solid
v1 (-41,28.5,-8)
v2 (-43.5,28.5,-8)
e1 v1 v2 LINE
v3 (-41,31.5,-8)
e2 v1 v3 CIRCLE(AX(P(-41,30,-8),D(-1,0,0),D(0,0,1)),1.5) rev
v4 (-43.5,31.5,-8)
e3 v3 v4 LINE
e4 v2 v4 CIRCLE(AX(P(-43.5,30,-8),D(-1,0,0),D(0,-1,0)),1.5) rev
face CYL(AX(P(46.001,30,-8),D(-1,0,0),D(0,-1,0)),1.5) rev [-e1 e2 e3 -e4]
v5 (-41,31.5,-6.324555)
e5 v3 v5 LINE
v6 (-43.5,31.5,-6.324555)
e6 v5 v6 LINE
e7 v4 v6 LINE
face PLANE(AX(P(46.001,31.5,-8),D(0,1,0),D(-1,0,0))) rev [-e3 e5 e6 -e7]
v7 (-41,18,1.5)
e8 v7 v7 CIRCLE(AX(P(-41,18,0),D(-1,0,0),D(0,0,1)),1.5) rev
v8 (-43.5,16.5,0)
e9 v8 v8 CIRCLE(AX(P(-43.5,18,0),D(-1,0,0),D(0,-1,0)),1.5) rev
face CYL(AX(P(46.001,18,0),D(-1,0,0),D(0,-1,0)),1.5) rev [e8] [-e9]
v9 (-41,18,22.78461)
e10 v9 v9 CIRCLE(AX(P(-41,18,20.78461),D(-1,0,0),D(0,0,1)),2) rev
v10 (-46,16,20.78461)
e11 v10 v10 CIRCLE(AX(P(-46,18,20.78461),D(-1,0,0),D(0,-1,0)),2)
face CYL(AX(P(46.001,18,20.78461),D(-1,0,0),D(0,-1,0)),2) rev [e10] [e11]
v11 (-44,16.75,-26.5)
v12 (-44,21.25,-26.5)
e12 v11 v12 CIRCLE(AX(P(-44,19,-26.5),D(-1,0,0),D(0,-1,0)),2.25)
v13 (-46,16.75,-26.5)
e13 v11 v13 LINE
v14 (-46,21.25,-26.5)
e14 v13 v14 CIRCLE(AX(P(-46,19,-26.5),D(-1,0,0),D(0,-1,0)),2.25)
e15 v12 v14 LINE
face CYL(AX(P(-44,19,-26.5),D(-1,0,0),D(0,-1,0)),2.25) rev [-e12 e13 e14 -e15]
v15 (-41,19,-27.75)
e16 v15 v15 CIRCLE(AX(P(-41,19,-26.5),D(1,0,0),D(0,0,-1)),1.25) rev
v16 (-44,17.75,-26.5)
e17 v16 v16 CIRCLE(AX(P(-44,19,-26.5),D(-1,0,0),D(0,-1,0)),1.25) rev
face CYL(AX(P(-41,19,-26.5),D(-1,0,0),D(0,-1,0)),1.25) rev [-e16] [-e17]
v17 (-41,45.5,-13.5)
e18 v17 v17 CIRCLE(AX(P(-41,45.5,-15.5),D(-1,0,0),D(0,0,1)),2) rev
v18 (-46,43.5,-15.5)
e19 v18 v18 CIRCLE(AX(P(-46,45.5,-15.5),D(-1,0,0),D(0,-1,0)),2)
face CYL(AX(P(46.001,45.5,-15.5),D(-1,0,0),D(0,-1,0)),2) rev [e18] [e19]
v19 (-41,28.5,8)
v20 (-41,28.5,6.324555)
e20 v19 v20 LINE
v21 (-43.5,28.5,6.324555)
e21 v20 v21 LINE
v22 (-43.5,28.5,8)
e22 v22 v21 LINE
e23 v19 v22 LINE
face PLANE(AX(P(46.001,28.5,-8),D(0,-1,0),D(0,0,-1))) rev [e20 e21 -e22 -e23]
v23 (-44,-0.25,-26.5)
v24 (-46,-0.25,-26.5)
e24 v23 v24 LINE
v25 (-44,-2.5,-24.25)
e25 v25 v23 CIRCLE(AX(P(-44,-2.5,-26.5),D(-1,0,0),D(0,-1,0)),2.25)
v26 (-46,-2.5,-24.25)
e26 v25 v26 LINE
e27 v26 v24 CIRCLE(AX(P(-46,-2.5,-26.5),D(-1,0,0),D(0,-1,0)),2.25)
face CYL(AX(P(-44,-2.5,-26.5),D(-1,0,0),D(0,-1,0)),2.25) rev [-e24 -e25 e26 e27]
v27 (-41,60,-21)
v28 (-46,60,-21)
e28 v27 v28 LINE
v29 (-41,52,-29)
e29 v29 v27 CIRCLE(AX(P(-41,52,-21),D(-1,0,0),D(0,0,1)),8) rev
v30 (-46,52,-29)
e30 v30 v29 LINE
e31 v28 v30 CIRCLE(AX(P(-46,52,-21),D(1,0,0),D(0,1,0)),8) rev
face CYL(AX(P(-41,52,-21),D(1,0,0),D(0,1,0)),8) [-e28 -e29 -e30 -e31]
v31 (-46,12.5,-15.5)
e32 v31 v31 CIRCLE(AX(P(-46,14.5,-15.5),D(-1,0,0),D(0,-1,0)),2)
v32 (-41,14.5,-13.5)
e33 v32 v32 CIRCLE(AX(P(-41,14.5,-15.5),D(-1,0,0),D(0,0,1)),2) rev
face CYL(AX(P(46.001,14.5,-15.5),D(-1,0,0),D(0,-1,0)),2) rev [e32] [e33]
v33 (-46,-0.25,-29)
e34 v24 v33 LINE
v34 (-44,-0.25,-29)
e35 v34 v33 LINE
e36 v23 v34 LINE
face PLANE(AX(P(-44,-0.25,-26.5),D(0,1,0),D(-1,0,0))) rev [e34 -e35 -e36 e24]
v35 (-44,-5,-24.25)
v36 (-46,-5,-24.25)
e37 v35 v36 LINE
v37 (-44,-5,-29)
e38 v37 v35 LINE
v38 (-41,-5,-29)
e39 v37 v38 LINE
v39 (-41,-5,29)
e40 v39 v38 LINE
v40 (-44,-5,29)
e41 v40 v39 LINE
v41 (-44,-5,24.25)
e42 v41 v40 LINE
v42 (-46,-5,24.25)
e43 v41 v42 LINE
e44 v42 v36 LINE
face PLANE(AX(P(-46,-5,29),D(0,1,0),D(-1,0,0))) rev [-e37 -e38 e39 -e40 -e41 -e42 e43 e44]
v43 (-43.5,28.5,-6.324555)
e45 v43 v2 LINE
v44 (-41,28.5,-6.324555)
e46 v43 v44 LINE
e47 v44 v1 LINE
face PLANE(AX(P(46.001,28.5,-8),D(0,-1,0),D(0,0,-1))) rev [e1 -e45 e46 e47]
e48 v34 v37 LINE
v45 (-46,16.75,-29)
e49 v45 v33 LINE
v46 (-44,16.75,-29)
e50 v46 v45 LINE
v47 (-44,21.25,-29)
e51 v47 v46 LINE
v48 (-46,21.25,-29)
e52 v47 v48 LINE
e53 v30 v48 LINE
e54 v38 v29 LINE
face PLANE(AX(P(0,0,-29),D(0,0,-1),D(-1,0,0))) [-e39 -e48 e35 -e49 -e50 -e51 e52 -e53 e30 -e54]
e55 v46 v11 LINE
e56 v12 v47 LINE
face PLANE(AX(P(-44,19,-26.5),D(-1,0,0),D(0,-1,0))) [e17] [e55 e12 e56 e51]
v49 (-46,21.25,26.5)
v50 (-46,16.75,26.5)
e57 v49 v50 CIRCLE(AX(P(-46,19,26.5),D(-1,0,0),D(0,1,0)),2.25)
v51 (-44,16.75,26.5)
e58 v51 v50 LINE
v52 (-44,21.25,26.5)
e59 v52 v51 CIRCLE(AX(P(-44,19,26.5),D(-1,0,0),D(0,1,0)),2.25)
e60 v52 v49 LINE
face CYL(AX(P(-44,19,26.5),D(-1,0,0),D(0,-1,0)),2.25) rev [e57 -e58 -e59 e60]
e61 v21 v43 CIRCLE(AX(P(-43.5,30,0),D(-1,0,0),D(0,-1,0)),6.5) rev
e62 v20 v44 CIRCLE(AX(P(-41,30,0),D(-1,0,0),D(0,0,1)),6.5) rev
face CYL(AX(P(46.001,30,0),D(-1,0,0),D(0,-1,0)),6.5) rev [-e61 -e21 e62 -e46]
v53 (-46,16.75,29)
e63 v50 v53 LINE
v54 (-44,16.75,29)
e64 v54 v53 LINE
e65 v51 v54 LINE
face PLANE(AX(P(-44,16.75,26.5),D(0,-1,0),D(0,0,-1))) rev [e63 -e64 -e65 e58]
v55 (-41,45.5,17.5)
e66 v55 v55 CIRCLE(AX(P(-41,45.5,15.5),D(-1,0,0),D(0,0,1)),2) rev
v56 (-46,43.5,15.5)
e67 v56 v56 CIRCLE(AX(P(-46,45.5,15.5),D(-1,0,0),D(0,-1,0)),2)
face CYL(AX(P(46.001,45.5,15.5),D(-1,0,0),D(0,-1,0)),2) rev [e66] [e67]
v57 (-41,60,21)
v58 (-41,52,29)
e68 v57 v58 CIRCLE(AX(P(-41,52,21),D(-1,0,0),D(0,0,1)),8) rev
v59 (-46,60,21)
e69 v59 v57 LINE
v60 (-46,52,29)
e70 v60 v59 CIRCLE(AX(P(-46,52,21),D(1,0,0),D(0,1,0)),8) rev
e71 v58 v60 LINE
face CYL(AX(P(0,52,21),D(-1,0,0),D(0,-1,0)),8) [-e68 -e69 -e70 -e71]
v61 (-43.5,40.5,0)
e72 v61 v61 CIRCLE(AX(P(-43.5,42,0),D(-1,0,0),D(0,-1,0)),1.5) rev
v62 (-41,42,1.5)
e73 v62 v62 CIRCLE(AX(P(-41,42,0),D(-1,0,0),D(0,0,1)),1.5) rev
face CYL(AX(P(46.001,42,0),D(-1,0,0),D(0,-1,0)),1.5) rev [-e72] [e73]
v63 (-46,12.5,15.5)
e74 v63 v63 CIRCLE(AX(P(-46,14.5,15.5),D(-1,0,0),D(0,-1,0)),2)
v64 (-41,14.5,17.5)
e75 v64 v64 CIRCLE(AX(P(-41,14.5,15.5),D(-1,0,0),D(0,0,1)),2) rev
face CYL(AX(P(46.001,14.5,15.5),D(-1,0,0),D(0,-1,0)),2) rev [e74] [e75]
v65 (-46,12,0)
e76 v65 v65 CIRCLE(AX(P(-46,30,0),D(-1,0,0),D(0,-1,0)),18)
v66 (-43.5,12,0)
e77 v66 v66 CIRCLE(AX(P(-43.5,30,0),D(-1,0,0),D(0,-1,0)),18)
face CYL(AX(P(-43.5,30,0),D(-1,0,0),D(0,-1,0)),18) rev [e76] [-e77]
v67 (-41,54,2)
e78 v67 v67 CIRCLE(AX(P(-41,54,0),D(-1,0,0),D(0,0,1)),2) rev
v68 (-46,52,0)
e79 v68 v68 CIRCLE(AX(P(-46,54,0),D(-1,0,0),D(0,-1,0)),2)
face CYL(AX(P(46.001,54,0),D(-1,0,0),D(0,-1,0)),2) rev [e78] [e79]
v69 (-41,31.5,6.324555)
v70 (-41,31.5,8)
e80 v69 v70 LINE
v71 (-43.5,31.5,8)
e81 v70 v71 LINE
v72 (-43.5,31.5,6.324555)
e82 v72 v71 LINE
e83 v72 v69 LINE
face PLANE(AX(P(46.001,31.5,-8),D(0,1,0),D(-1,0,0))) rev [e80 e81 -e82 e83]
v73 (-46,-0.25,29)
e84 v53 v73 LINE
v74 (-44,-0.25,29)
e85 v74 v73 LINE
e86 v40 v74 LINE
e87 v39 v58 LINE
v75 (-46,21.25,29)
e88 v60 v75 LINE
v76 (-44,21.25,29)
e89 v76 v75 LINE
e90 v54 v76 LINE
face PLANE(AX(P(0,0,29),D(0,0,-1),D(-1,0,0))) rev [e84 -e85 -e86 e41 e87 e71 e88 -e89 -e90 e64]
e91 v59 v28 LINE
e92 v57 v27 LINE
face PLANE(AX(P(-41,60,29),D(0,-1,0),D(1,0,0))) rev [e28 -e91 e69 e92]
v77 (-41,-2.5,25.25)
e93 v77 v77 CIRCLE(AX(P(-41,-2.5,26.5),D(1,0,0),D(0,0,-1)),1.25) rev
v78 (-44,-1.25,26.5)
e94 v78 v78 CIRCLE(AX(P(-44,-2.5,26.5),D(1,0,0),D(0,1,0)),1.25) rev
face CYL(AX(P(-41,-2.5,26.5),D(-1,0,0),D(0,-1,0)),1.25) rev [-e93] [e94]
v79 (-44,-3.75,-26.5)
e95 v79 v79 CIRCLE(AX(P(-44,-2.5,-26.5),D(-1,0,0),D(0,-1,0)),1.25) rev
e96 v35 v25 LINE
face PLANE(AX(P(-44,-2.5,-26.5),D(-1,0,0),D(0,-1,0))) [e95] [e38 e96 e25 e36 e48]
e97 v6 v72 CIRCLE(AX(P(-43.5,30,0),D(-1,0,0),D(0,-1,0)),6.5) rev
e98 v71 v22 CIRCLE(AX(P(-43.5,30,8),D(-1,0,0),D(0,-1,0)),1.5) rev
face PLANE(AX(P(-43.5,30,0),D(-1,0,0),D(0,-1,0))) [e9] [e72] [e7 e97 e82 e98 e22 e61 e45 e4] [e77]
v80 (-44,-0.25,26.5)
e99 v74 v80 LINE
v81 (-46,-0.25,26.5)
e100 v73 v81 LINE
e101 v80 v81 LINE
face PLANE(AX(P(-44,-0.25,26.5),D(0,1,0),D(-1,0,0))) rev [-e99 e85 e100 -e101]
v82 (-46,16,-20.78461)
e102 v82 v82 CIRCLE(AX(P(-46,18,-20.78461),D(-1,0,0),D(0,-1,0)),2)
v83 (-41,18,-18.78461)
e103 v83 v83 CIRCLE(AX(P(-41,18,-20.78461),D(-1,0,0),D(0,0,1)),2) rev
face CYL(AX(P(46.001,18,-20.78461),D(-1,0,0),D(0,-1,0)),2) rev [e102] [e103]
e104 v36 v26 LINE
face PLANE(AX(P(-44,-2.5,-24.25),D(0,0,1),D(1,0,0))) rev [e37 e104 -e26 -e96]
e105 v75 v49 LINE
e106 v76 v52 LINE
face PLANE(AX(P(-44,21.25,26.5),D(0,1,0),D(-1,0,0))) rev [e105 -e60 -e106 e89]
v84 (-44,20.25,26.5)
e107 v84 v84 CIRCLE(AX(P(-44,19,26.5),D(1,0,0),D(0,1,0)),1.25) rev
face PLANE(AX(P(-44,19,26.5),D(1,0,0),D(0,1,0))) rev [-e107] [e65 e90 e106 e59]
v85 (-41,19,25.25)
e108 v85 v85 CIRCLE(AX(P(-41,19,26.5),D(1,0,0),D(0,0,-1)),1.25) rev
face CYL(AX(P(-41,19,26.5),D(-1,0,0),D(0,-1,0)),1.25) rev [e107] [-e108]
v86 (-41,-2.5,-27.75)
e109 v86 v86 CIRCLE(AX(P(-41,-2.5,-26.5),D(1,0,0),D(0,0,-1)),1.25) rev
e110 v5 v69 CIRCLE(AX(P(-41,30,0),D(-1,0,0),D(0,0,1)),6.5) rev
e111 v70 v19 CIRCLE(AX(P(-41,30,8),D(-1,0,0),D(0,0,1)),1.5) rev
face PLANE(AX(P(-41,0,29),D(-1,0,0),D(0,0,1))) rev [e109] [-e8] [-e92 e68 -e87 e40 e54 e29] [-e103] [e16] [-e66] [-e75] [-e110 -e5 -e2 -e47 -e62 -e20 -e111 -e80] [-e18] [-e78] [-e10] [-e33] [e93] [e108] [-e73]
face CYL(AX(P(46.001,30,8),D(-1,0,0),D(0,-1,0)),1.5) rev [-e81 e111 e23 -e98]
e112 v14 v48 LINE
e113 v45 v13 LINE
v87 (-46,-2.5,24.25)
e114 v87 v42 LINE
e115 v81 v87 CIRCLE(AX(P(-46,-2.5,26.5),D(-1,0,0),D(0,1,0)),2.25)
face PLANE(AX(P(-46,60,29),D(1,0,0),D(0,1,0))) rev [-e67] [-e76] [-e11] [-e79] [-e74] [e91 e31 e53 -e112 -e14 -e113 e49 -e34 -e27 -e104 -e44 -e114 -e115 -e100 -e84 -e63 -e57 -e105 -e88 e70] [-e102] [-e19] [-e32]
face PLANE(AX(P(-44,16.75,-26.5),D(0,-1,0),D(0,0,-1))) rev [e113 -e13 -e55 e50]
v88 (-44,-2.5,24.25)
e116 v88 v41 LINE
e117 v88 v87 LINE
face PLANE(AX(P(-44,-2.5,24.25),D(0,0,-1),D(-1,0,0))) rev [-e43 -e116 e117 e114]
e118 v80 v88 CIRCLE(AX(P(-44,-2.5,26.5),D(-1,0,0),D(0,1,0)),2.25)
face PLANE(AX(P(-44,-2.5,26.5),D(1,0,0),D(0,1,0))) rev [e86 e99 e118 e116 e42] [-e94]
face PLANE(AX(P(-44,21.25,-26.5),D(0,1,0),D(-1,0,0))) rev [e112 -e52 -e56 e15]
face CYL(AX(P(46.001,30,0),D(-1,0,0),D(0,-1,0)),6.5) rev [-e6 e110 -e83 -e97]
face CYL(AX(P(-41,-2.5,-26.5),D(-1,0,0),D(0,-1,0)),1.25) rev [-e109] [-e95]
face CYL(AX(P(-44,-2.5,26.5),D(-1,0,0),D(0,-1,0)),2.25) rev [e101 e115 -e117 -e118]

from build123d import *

# Parameters (mm, degrees)
RESSALTO_EXTRUS_O1_DEPTH  = 29
CORTE_EXTRUS_O1_REACH     = 115.6
ESBO_O2_R                 = 6.5
ESBO_O3_R                 = 18
CORTE_EXTRUS_O2_DEPTH     = 2.5
CORTE_EXTRUS_O3_START     = -5
ESBO_O5_R                 = 2
ESBO_O5_R_2               = 1.5
CORTE_EXTRUS_O3_DEPTH     = 5
ESBO_O7_R                 = 12
ESBO_O7_R_2               = 2
CORTE_EXTRUS_O4_DEPTH     = 110.590145542
ESBO_O11_W                = 18
ESBO_O11_H                = 10
RESSALTO_EXTRUS_O3_DEPTH  = 8
ESBO_O12_W                = 14.4
ESBO_O12_H                = 6.8
CORTE_EXTRUS_O6_DEPTH     = 3
ESBO_O13_W                = 13.4
ESBO_O13_H                = 5.8
CORTE_EXTRUS_O7_DEPTH     = 5
CORTE_EXTRUS_O8_REACH     = 84.898
RESSALTO_EXTRUS_O4_DEPTH  = 5
ESBO_O17_W                = 2.6
ESBO_O17_H                = 10
RESSALTO_EXTRUS_O5_DEPTH  = 8
CHANFRO1_SIZE             = 5
FILETE1_R                 = 8
ESBO_O18_W                = 20
ESBO_O18_H                = 8
RESSALTO_EXTRUS_O6_DEPTH  = 13
ESBO_O19_R                = 2.25
CORTE_EXTRUS_O9_DEPTH     = 80.252760204
CHANFRO2_SIZE             = 3
CHANFRO2_SIZE_2           = 13
CORTE_EXTRUS_O10_START    = -6
CORTE_EXTRUS_O10_DEPTH    = 74.252760204
ESBO_O21_W                = 26
ESBO_O21_H                = 16
RESSALTO_EXTRUS_O7_DEPTH  = 30
CORTE_EXTRUS_O11_DEPTH    = 26
ESBO_O24_R                = 1
ESBO_O24_W                = 17.2
ESBO_O24_H                = 3
RESSALTO_EXTRUS_O8_DEPTH  = 3
ESBO_O25_W                = 11.2
ESBO_O25_H                = 4
CORTE_EXTRUS_O12_DEPTH    = 2
ESBO_O26_R                = 3.5
CORTE_EXTRUS_O13_DEPTH    = 96.289033997
ESBO_O27_W                = 24
ESBO_O27_H                = 8
RESSALTO_EXTRUS_O9_DEPTH  = 6
ESBO_O28_W                = 1.5
ESBO_O28_H                = 8
RESSALTO_EXTRUS_O10_DEPTH = 2
ESBO_O31_R                = 1
CORTE_EXTRUS_O14_DEPTH    = 85.172442046
ESBO_O32_R                = 1
CORTE_EXTRUS_O15_DEPTH    = 12
ESBO_O33_R                = 1.25
CORTE_EXTRUS_O16_DEPTH    = 5
CORTE_EXTRUS_O17_DEPTH    = 2
ESBO_O37_R                = 54.092518309
CORTE_EXTRUS_O19_DEPTH    = 114.723348526


with BuildPart() as part:
    # Esboço1 → Ressalto-extrusão1 (new, symmetric)
    with BuildSketch(Plane.XY):
        Polygon((0, 0), (-41, 0), (-41, 60), (-46, 60), (-46, -5), (46, -5), (46, 60), (41, 60), (41, 0), align=None)
    extrude(amount=RESSALTO_EXTRUS_O1_DEPTH, both=True)

    # Esboço2 → Corte-extrusão1 (cut, up to next)
    with BuildSketch(Plane.ZY.offset(46), mode=Mode.PRIVATE) as corte_extrus_o1_sk1:
        with Locations(Location((0, 30, 0), (0, 0, 270))):
            Circle(ESBO_O2_R)
    corte_extrus_o1_tool1 = extrude(corte_extrus_o1_sk1.sketch, amount=-CORTE_EXTRUS_O1_REACH, mode=Mode.PRIVATE) & part.part
    add(corte_extrus_o1_tool1.solids().sort_by_distance((-46, 30, 0))[0], mode=Mode.SUBTRACT)

    # Esboço3 → Corte-extrusão2 (cut)
    with BuildSketch(Plane.ZY.offset(46)):
        with Locations(Location((0, 30, 0), (0, 0, 270))):
            Circle(ESBO_O3_R)
    extrude(amount=-CORTE_EXTRUS_O2_DEPTH, mode=Mode.SUBTRACT)

    # Esboço5 → Corte-extrusão3 (cut)
    with BuildSketch(Plane.ZY.offset(46).offset(CORTE_EXTRUS_O3_START)):
        with Locations(Location((-15.5, 45.5, 0), (0, 0, 270))):
            Circle(ESBO_O5_R)
        with Locations(Location((0, 42, 0), (0, 0, 270))):
            Circle(ESBO_O5_R_2)
        with Locations(Location((0, 18, 0), (0, 0, 270))):
            Circle(ESBO_O5_R_2)
        with Locations(Location((0, 54, 0), (0, 0, 270))):
            Circle(ESBO_O5_R)
        with Locations(Location((15.5, 45.5, 0), (0, 0, 270))):
            Circle(ESBO_O5_R)
        with Locations(Location((15.5, 14.5, 0), (0, 0, 270))):
            Circle(ESBO_O5_R)
        with Locations(Location((-15.5, 14.5, 0), (0, 0, 270))):
            Circle(ESBO_O5_R)
        with Locations(Location((20.784609691, 18, 0), (0, 0, 270))):
            Circle(ESBO_O5_R)
        with Locations(Location((-20.784609691, 18, 0), (0, 0, 270))):
            Circle(ESBO_O5_R)
        with BuildLine():
            Line((-8, 31.5), (8, 31.5))
            ThreePointArc((8, 31.5), (9.5, 30), (8, 28.5))
            Line((8, 28.5), (-8, 28.5))
            ThreePointArc((-8, 28.5), (-9.5, 30), (-8, 31.5))
        make_face()
    extrude(amount=CORTE_EXTRUS_O3_DEPTH, mode=Mode.SUBTRACT)

    # Esboço7 → Corte-extrusão4 (cut, through all)
    with BuildSketch(Plane.ZY.offset(-41)):
        with Locations(Location((0, 30, 0), (0, 0, 270))):
            Circle(ESBO_O7_R)
        with Locations(Location((-15.5, 45.5, 0), (0, 0, 270))):
            Circle(ESBO_O7_R_2)
        with Locations(Location((15.5, 45.5, 0), (0, 0, 270))):
            Circle(ESBO_O7_R_2)
        with Locations(Location((15.5, 14.5, 0), (0, 0, 270))):
            Circle(ESBO_O7_R_2)
        with Locations(Location((-15.5, 14.5, 0), (0, 0, 270))):
            Circle(ESBO_O7_R_2)
    extrude(amount=-CORTE_EXTRUS_O4_DEPTH, mode=Mode.SUBTRACT)

    # Esboço11 → Ressalto-extrusão3 (add)
    with BuildSketch(Plane(origin=(0, 0, 0), x_dir=(1, 0, 0), z_dir=(0, 1, 0))):
        with Locations((-29.4, 0)):
            Rectangle(ESBO_O11_W, ESBO_O11_H)
    extrude(amount=RESSALTO_EXTRUS_O3_DEPTH)

    # Esboço12 → Corte-extrusão6 (cut)
    with BuildSketch(Plane(origin=(0, 8, 0), x_dir=(1, 0, 0), z_dir=(0, 1, 0))):
        with Locations((-29.4, 0)):
            Rectangle(ESBO_O12_W, ESBO_O12_H)
    extrude(amount=-CORTE_EXTRUS_O6_DEPTH, mode=Mode.SUBTRACT)

    # Esboço13 → Corte-extrusão7 (cut)
    with BuildSketch(Plane(origin=(0, 5, 0), x_dir=(1, 0, 0), z_dir=(0, 1, 0))):
        with Locations((-29.4, 0)):
            Rectangle(ESBO_O13_W, ESBO_O13_H)
    extrude(amount=-CORTE_EXTRUS_O7_DEPTH, mode=Mode.SUBTRACT)

    # Esboço14 → Corte-extrusão8 (cut, up to next)
    with BuildSketch(Plane.XY.offset(5), mode=Mode.PRIVATE) as corte_extrus_o8_sk1:
        with BuildLine():
            Line((-33.4, 0), (-25.4, 0))
            ThreePointArc((-25.4, 0), (-29.4, 4), (-33.4, 0))
        make_face()
    corte_extrus_o8_tool1 = extrude(corte_extrus_o8_sk1.sketch, amount=-CORTE_EXTRUS_O8_REACH, mode=Mode.PRIVATE) & part.part
    add(corte_extrus_o8_tool1.solids().sort_by_distance((-29.4, 1.697653, 5))[0], mode=Mode.SUBTRACT)

    # Esboço16 → Ressalto-extrusão4 (add)
    with BuildSketch(Plane.XY.offset(29)):
        Polygon((-41, 32), (-21, 12), (21, 12), (41, 32), (41, 0), (-41, 0), align=None)
    ressalto_extrus_o4 = extrude(amount=-RESSALTO_EXTRUS_O4_DEPTH)

    # Espelhar1: Ressalto-extrusão4 across plane
    add(ressalto_extrus_o4.mirror(Plane.XY))

    # Esboço17 → Ressalto-extrusão5 (add)
    with BuildSketch(Plane(origin=(0, 8, 0), x_dir=(1, 0, 0), z_dir=(0, 1, 0))):
        with Locations((-39.7, 0)):
            Rectangle(ESBO_O17_W, ESBO_O17_H)
    extrude(amount=-RESSALTO_EXTRUS_O5_DEPTH)

    # Chanfro1
    chanfro1_edges = [part.edges().sort_by_distance(p)[0] for p in [
        (41, 0, 0),
        (-41, 0, 14.5),
        (-41, 0, -14.5),
    ]]
    chamfer(chanfro1_edges, length=CHANFRO1_SIZE)

    # Filete1
    filete1_edges = [part.edges().sort_by_distance(p)[0] for p in [
        (-43.5, 60, -29),
        (-43.5, 60, 29),
        (-41, 32, 26.5),
        (-21, 12, 26.5),
        (21, 12, 26.5),
        (41, 32, 26.5),
        (-41, 32, -26.5),
        (41, 32, -26.5),
        (21, 12, -26.5),
        (-21, 12, -26.5),
        (43.5, 60, 29),
        (43.5, 60, -29),
    ]]
    fillet(filete1_edges, radius=FILETE1_R)

    # Esboço18 → Ressalto-extrusão6 (add)
    with BuildSketch(Plane.XY.offset(29)):
        with Locations((22, 7)):
            Rectangle(ESBO_O18_W, ESBO_O18_H)
    extrude(amount=RESSALTO_EXTRUS_O6_DEPTH)

    # Esboço19 → Corte-extrusão9 (cut, through all)
    with BuildSketch(Plane(origin=(0, 11, 0), x_dir=(1, 0, 0), z_dir=(0, 1, 0))):
        with Locations(Location((18, -35.75, 0), (0, 0, 270))):
            Circle(ESBO_O19_R)
        with Locations(Location((26, -35.75, 0), (0, 0, 270))):
            Circle(ESBO_O19_R)
    extrude(amount=-CORTE_EXTRUS_O9_DEPTH, mode=Mode.SUBTRACT)

    # Chanfro2
    # the kernel refuses this chamfer: 13, 3 mm, written as the material it adds along each edge
    with BuildSketch(Plane(origin=(12, 3, 29), x_dir=(0, -0.987043568605235, -0.1604524654688814), z_dir=(1, 0, 0))) as chanfro2_piece_1_section:
        Polygon((CHANFRO2_SIZE * 0.987043568605, -CHANFRO2_SIZE * 0.160452465469), (-CHANFRO2_SIZE_2 * 0.160452465469, -CHANFRO2_SIZE_2 * 0.987043568605), (0, 0), align=None)
    chanfro2_piece_1 = extrude(amount=20, mode=Mode.PRIVATE)
    chanfro2_piece_1 = split(chanfro2_piece_1, bisect_by=Plane(origin=(21.999997786, 2.099377296, 42), z_dir=(0, 0, -1)), keep=Keep.TOP, mode=Mode.PRIVATE)
    chanfro2_piece_1 = chanfro2_piece_1 - Plane(origin=(18, 2.099377296, 35.75), x_dir=(0, 0, 1), z_dir=(0, 1, 0)) * Cylinder(2.25, 92, mode=Mode.PRIVATE)
    chanfro2_piece_1 = chanfro2_piece_1 - Plane(origin=(26, 2.099377296, 35.75), x_dir=(0, 0, 1), z_dir=(0, 1, 0)) * Cylinder(2.25, 92, mode=Mode.PRIVATE)
    add(chanfro2_piece_1)

    # Esboço20 → Corte-extrusão10 (cut, through all)
    with BuildSketch(Plane(origin=(0, 11, 0), x_dir=(1, 0, 0), z_dir=(0, 1, 0)).offset(CORTE_EXTRUS_O10_START)):
        with BuildLine():
            Line((18, -31.5), (26, -31.5))
            ThreePointArc((26, -31.5), (30.25, -35.75), (26, -40))
            Line((26, -40), (18, -40))
            ThreePointArc((18, -40), (13.75, -35.75), (18, -31.5))
        make_face()
    extrude(amount=-CORTE_EXTRUS_O10_DEPTH, mode=Mode.SUBTRACT)

    # Esboço21 → Ressalto-extrusão7 (add)
    with BuildSketch(Plane(origin=(0, 0, 0), x_dir=(1, 0, 0), z_dir=(0, 1, 0))):
        with Locations((-1, 0)):
            Rectangle(ESBO_O21_W, ESBO_O21_H)
    extrude(amount=RESSALTO_EXTRUS_O7_DEPTH)

    # Esboço22 → Corte-extrusão11 (cut)
    with BuildSketch(Plane(origin=(12, 0, 0), x_dir=(0, 0, -1), z_dir=(1, 0, 0))):
        Polygon((6.812733176, 30), (3.406366588, 35.9), (-3.406366588, 35.9), (-6.812733176, 30), (-3.406366588, 24.1), (3.406366588, 24.1), align=None)
    extrude(amount=-CORTE_EXTRUS_O11_DEPTH, mode=Mode.SUBTRACT)

    # Esboço24 → Ressalto-extrusão8 (add)
    # profile 1 of 2: a face of its own
    with BuildSketch(Plane(origin=(0, 0, 0), x_dir=(1, 0, 0), z_dir=(0, 1, 0))):
        with BuildLine():
            Line((17.282291959, 14), (32.482291959, 14))
            ThreePointArc((32.482291959, 14), (34.482291959, 12), (32.482291959, 10))
            Line((32.482291959, 10), (17.282291959, 10))
            ThreePointArc((17.282291959, 10), (15.282291959, 12), (17.282291959, 14))
        make_face()
        with Locations(Location((17.282291959, 12, 0), (0, 0, 180))):
            Circle(ESBO_O24_R, mode=Mode.SUBTRACT)
        with Locations(Location((32.482291959, 12, 0), (0, 0, 180))):
            Circle(ESBO_O24_R, mode=Mode.SUBTRACT)
    # profile 2 of 2: a face of its own
    with BuildSketch(Plane(origin=(0, 0, 0), x_dir=(1, 0, 0), z_dir=(0, 1, 0))):
        with Locations((24.882291959, -8.5)):
            Rectangle(ESBO_O24_W, ESBO_O24_H)
    extrude(amount=RESSALTO_EXTRUS_O8_DEPTH)

    # Esboço25 → Corte-extrusão12 (cut)
    with BuildSketch(Plane(origin=(0, 3, 0), x_dir=(1, 0, 0), z_dir=(0, 1, 0))):
        with Locations((24.882291959, 12)):
            Rectangle(ESBO_O25_W, ESBO_O25_H)
    extrude(amount=-CORTE_EXTRUS_O12_DEPTH, mode=Mode.SUBTRACT)

    # Esboço26 → Corte-extrusão13 (cut, through all)
    with BuildSketch(Plane.XY.offset(29)):
        with Locations((36, 5)):
            Circle(ESBO_O26_R)
    extrude(amount=-CORTE_EXTRUS_O13_DEPTH, mode=Mode.SUBTRACT)

    # Esboço27 → Ressalto-extrusão9 (add)
    with BuildSketch(Plane(origin=(0, 0, 0), x_dir=(1, 0, 0), z_dir=(0, 1, 0))):
        with Locations((-4, 16)):
            Rectangle(ESBO_O27_W, ESBO_O27_H)
    extrude(amount=RESSALTO_EXTRUS_O9_DEPTH)

    # Esboço28 → Ressalto-extrusão10 (add)
    with BuildSketch(Plane(origin=(0, 6, 0), x_dir=(1, 0, 0), z_dir=(0, 1, 0))):
        with Locations((-15.25, 16)):
            Rectangle(ESBO_O28_W, ESBO_O28_H)
        with Locations((7.25, 16)):
            Rectangle(ESBO_O28_W, ESBO_O28_H)
    extrude(amount=RESSALTO_EXTRUS_O10_DEPTH)

    # Esboço31 → Corte-extrusão14 (cut, through all)
    with BuildSketch(Plane.XY.offset(8)):
        with Locations((-10, 22.5)):
            Circle(ESBO_O31_R)
        with Locations((8, 22.5)):
            Circle(ESBO_O31_R)
    extrude(amount=-CORTE_EXTRUS_O14_DEPTH, mode=Mode.SUBTRACT)

    # Esboço32 → Corte-extrusão15 (cut)
    with BuildSketch(Plane.ZY.offset(46)):
        with Locations(Location((-26.5, -2.5, 0), (0, 0, 270))):
            Circle(ESBO_O32_R)
        with Locations(Location((-26.5, 19, 0), (0, 0, 270))):
            Circle(ESBO_O32_R)
        with Locations(Location((26.5, 19, 0), (0, 0, 90))):
            Circle(ESBO_O32_R)
        with Locations(Location((26.5, -2.5, 0), (0, 0, 90))):
            Circle(ESBO_O32_R)
    corte_extrus_o15 = extrude(amount=-CORTE_EXTRUS_O15_DEPTH, mode=Mode.SUBTRACT)

    # Esboço33 → Corte-extrusão16 (cut)
    with BuildSketch(Plane.ZY.offset(46)):
        with Locations(Location((-26.5, -2.5, 0), (0, 0, 270))):
            Circle(ESBO_O33_R)
        with Locations(Location((-26.5, 19, 0), (0, 0, 270))):
            Circle(ESBO_O33_R)
        with Locations(Location((26.5, 19, 0), (0, 0, 90))):
            Circle(ESBO_O33_R)
        with Locations(Location((26.5, -2.5, 0), (0, 0, 90))):
            Circle(ESBO_O33_R)
    corte_extrus_o16 = extrude(amount=-CORTE_EXTRUS_O16_DEPTH, mode=Mode.SUBTRACT)

    # Esboço34 → Corte-extrusão17 (cut)
    with BuildSketch(Plane.ZY.offset(46)):
        with BuildLine():
            Line((-26.5, -0.25), (-29, -0.25))
            Line((-29, -0.25), (-29, -5))
            Line((-29, -5), (-24.25, -5))
            Line((-24.25, -5), (-24.25, -2.5))
            ThreePointArc((-24.25, -2.5), (-24.909009742, -0.909009742), (-26.5, -0.25))
        make_face()
        with BuildLine():
            Line((-26.5, 21.25), (-29, 21.25))
            Line((-29, 21.25), (-29, 16.75))
            Line((-29, 16.75), (-26.5, 16.75))
            ThreePointArc((-26.5, 16.75), (-24.25, 19), (-26.5, 21.25))
        make_face()
        with BuildLine():
            Line((29, 16.75), (29, 21.25))
            Line((29, 21.25), (26.5, 21.25))
            ThreePointArc((26.5, 21.25), (24.25, 19), (26.5, 16.75))
            Line((26.5, 16.75), (29, 16.75))
        make_face()
        with BuildLine():
            Line((29, -5), (24.25, -5))
            Line((24.25, -5), (24.25, -2.5))
            ThreePointArc((24.25, -2.5), (24.909009742, -0.909009742), (26.5, -0.25))
            Line((26.5, -0.25), (29, -0.25))
            Line((29, -0.25), (29, -5))
        make_face()
    corte_extrus_o17 = extrude(amount=-CORTE_EXTRUS_O17_DEPTH, mode=Mode.SUBTRACT)

    # Espelhar2: Corte-extrusão15, Corte-extrusão16, Corte-extrusão17 across plane
    add(corte_extrus_o15.mirror(Plane(origin=(0, 0, 0), x_dir=(0, 0, 1), z_dir=(1, 0, 0))), mode=Mode.SUBTRACT)
    add(corte_extrus_o16.mirror(Plane(origin=(0, 0, 0), x_dir=(0, 0, 1), z_dir=(1, 0, 0))), mode=Mode.SUBTRACT)
    add(corte_extrus_o17.mirror(Plane(origin=(0, 0, 0), x_dir=(0, 0, 1), z_dir=(1, 0, 0))), mode=Mode.SUBTRACT)

    # Esboço37 → Corte-extrusão19 (cut, through all)
    with BuildSketch(Plane(origin=(-41, 0, 0), x_dir=(0, 0, -1), z_dir=(1, 0, 0))):
        with Locations((0, 30)):
            Circle(ESBO_O37_R)
    extrude(amount=CORTE_EXTRUS_O19_DEPTH, mode=Mode.SUBTRACT)


solid = part.part
